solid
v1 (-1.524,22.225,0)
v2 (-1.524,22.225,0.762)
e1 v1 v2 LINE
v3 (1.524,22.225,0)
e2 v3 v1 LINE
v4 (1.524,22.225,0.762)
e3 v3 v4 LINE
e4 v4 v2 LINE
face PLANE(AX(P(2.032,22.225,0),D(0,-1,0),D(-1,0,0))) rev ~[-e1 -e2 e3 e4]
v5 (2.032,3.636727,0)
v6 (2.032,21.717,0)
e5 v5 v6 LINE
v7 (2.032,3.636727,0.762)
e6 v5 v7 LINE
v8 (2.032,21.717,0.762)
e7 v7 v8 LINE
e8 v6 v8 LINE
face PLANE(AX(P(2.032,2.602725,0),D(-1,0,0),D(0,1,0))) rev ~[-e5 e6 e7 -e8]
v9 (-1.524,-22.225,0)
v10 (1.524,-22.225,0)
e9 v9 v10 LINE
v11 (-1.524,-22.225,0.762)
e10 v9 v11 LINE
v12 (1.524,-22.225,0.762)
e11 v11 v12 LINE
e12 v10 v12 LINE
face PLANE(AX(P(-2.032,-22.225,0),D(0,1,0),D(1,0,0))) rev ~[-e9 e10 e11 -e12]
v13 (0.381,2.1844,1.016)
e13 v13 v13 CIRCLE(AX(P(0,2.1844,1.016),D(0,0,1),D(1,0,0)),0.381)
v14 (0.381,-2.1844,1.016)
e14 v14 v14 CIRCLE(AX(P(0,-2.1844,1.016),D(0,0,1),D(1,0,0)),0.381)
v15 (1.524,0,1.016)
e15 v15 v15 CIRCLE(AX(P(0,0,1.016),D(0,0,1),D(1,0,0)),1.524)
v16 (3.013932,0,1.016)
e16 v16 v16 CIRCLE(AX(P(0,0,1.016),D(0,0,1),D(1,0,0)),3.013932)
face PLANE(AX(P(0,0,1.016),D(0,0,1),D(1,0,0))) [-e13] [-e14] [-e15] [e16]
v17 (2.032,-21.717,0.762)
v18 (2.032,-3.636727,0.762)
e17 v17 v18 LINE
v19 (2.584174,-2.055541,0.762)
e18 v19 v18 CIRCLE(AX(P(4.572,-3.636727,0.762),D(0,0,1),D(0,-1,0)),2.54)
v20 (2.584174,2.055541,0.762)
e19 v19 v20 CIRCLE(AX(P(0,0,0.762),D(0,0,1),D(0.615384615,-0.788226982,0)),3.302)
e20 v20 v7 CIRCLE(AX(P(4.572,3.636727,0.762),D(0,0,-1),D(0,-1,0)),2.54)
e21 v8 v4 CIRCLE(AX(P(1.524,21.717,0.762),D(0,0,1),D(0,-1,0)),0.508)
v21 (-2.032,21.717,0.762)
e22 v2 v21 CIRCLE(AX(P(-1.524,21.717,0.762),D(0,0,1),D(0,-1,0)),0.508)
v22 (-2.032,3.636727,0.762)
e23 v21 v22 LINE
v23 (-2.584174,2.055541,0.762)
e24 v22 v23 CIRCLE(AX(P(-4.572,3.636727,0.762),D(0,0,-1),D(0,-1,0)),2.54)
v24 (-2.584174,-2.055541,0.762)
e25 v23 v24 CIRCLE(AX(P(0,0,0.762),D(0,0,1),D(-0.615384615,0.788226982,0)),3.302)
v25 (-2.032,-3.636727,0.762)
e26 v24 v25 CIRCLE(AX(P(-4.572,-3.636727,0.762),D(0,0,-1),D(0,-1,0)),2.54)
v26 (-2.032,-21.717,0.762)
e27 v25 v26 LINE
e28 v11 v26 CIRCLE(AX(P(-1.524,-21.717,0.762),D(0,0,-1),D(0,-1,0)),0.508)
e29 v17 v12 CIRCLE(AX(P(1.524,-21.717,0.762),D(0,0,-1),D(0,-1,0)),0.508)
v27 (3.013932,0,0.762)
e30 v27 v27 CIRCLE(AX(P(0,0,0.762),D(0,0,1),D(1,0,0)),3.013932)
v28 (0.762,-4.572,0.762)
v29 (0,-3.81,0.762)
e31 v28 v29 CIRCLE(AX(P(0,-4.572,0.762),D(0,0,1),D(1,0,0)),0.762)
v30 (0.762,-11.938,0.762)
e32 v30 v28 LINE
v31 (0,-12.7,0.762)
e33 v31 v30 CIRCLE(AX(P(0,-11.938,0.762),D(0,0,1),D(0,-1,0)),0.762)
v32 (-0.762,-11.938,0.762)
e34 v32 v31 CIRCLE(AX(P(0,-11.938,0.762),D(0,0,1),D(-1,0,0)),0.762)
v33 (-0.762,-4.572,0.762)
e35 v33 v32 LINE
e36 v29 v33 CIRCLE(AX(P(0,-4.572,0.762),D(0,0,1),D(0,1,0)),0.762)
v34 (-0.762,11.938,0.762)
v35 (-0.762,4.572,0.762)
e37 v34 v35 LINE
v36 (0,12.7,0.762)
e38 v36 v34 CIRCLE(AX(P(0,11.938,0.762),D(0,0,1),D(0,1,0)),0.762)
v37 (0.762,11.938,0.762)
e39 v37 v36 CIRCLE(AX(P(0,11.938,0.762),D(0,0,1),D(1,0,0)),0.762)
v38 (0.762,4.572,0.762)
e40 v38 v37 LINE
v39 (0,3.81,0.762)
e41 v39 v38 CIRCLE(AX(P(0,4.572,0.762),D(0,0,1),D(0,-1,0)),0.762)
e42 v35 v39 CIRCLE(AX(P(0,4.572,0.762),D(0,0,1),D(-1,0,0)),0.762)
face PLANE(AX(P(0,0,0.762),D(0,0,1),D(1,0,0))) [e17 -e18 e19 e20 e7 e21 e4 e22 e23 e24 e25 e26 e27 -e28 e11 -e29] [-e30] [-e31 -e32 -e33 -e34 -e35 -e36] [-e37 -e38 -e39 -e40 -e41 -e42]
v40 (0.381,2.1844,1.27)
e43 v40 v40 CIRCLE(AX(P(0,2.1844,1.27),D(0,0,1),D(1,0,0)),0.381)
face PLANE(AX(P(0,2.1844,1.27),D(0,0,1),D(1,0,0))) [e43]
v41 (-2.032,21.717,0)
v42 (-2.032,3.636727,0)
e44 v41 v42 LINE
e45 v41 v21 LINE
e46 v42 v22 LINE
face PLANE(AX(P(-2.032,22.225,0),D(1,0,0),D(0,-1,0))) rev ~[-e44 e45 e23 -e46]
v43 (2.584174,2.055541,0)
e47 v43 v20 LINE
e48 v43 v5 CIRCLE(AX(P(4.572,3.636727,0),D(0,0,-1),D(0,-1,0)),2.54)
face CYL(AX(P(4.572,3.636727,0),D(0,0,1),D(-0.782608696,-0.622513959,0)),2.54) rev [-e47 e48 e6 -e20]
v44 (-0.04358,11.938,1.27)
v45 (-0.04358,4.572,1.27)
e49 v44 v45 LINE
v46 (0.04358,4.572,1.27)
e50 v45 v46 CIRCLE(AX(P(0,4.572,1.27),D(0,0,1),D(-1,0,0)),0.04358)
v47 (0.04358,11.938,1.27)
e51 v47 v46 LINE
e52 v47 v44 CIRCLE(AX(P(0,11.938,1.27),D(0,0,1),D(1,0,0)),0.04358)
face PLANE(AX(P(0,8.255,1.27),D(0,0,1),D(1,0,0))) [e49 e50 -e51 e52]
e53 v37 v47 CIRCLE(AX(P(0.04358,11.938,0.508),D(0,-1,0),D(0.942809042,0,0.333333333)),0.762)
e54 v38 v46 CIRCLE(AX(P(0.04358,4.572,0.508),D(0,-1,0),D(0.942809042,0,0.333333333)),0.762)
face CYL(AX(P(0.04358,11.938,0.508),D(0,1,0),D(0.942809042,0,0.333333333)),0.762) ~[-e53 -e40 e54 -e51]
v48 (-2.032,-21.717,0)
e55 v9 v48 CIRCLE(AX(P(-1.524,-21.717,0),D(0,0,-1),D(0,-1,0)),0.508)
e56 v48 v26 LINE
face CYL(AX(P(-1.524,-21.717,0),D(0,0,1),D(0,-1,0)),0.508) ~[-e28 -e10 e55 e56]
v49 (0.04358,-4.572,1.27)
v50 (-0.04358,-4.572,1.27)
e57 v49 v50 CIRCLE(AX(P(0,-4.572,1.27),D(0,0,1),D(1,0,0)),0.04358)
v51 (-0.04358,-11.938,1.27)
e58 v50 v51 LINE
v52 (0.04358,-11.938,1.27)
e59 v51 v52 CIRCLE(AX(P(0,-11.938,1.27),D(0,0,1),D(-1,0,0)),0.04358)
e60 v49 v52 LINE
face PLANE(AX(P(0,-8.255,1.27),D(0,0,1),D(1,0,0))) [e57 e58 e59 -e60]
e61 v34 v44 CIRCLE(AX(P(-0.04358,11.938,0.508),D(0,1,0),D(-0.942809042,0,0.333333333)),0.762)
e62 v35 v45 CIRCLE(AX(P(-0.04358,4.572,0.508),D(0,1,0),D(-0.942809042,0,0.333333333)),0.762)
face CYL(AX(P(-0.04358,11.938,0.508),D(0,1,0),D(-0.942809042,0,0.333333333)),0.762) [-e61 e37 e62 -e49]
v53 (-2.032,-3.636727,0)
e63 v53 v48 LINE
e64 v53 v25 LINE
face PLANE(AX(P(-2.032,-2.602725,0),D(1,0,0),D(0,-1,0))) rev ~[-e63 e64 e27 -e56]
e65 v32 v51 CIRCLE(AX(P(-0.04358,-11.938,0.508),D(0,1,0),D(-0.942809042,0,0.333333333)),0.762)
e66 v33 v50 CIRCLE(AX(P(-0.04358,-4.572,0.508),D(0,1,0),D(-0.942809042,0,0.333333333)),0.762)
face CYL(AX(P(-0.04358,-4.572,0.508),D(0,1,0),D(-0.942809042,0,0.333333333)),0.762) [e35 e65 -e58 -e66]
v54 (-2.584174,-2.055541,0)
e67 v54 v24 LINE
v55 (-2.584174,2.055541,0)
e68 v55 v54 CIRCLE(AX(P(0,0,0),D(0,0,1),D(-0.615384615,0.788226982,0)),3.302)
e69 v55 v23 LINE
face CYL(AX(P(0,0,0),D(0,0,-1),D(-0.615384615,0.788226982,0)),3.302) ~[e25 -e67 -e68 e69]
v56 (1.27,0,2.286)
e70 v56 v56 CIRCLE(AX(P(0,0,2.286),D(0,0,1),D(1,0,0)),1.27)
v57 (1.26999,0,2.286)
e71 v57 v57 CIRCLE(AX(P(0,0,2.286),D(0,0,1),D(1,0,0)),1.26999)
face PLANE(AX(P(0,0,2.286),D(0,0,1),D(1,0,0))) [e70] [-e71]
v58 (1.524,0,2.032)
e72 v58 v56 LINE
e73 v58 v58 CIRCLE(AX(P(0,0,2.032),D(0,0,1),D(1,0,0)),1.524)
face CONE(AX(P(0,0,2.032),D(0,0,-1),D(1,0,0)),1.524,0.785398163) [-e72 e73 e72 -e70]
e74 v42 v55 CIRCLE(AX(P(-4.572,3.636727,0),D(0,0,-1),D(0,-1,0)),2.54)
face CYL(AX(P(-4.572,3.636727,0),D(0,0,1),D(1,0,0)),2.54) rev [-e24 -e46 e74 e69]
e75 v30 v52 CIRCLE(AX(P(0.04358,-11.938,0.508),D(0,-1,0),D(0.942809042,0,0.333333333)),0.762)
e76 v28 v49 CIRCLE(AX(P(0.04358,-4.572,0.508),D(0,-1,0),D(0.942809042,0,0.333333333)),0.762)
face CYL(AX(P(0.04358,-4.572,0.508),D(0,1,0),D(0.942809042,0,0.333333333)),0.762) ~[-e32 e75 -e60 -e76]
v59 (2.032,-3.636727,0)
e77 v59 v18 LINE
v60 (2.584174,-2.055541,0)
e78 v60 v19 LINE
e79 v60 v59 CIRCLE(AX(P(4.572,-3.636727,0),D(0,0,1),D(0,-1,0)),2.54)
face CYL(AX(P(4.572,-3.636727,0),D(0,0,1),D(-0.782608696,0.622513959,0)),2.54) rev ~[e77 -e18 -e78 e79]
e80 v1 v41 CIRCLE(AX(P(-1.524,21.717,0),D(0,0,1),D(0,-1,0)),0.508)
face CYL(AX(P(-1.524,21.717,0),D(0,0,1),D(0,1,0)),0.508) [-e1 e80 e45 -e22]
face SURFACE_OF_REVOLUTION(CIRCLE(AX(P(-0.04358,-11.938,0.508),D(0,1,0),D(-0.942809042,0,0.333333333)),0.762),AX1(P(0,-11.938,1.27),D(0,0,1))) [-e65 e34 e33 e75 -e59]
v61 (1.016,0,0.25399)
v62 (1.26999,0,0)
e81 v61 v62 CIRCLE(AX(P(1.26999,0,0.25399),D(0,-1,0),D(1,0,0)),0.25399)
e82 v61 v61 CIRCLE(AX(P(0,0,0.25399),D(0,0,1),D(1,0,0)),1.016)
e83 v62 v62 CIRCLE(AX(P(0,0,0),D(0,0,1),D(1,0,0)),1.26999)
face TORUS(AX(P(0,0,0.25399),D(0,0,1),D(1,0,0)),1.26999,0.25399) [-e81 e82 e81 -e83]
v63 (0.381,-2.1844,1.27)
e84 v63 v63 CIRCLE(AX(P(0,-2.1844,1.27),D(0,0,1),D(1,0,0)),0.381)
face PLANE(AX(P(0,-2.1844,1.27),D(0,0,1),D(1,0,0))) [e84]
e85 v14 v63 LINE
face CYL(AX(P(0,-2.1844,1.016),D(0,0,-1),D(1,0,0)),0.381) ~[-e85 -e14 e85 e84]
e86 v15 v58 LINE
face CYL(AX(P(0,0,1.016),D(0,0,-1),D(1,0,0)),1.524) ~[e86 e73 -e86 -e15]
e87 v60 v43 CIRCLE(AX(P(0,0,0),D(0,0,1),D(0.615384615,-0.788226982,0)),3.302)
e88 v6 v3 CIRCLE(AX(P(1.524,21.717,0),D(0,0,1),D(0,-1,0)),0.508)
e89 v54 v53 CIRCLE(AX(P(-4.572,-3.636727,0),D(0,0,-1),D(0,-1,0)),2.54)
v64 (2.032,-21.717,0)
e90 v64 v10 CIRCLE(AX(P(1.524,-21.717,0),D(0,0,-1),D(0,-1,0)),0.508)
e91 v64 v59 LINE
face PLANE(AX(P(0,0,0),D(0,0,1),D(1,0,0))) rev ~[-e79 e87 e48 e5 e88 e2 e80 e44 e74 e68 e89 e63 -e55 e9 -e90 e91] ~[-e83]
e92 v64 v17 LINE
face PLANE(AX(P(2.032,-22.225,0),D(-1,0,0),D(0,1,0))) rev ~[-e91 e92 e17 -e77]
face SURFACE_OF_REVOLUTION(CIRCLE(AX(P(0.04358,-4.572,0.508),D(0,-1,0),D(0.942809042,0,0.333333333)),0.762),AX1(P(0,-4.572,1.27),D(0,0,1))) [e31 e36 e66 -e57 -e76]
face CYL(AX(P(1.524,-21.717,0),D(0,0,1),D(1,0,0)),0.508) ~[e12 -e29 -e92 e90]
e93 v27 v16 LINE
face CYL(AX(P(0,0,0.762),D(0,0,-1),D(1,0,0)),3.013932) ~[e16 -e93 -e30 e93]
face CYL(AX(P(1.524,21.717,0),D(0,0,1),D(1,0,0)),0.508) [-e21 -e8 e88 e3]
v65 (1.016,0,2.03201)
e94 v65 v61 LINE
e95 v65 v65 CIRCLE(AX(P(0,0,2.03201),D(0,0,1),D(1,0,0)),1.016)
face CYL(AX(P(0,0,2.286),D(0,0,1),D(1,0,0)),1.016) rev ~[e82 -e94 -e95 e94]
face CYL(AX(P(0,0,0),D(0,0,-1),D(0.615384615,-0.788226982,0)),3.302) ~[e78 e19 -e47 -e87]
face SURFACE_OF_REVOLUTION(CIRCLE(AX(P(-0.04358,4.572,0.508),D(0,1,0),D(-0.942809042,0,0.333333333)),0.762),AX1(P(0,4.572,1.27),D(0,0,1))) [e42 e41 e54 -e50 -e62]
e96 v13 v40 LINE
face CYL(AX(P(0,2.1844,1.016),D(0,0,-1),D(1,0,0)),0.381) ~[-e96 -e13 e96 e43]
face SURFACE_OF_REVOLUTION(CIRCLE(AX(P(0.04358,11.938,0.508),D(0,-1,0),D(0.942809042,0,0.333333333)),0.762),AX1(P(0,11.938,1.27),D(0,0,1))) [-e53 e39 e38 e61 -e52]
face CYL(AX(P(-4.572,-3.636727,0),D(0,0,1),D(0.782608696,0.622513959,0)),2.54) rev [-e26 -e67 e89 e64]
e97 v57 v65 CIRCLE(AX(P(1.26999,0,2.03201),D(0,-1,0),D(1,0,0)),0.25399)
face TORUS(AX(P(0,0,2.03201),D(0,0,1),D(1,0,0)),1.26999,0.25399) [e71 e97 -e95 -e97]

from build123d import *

# Parameters (mm, degrees)
F1_DEPTH      = 0.762
F2_R          = 2.54
F3_R          = 0.508
F4_R          = 3.0139316414
F5_DEPTH      = 0.254
F6_R          = 1.524
F7_DEPTH      = 1.27
F8_SIZE       = 0.254
F9_R          = 0.381
F10_DEPTH     = 0.254
F11_R         = 1.016
F12_DEPTH     = 25.4
F13_R         = 0.25399
F15_DEPTH     = 0.508
F16_T1_DEPTH  = 7.366
F16_T3_DEPTH  = 7.366
F16_T6_ANGLE  = 180
F16_T8_ANGLE  = 180
F16_T10_ANGLE = 180
F16_T12_ANGLE = 180


# Not quite as in the source:
# - a fillet or chamfer that OpenCascade refuses, or shapes differently, is made with other operations: its cross-section is extruded or revolved along the edge and cut away or added
# - a fillet or chamfer is up to 0.001 mm smaller than in the source, because OpenCascade refuses the exact size


with BuildPart() as f1:
    # F0 (on Top) → F1 (new body)
    with BuildSketch(Plane.XY):
        with BuildLine():
            Line((2.032, -14.605), (2.032, -2.6027254946))
            ThreePointArc((2.032, -2.6027254946), (3.302, 0), (2.032, 2.6027254946))
            Line((2.032, 2.6027254946), (2.032, 14.605))
            Line((2.032, 14.605), (2.032, 22.225))
            Line((2.032, 22.225), (-2.032, 22.225))
            Line((-2.032, 22.225), (-2.032, 14.605))
            Line((-2.032, 14.605), (-2.032, 2.6027254946))
            ThreePointArc((-2.032, 2.6027254946), (-3.302, 0), (-2.032, -2.6027254946))
            Line((-2.032, -2.6027254946), (-2.032, -14.605))
            Line((-2.032, -14.605), (-2.032, -22.225))
            Line((-2.032, -22.225), (2.032, -22.225))
            Line((2.032, -22.225), (2.032, -14.605))
        make_face()
    extrude(amount=F1_DEPTH)

    # F2
    f2_edges = [f1.edges().sort_by_distance(p)[0] for p in [
        (-2.032, 2.602725, 0.381),
        (-2.032, -2.602725, 0.381),
        (2.032, 2.602725, 0.381),
        (2.032, -2.602725, 0.381),
    ]]
    fillet(f2_edges, radius=F2_R)

    # F3
    f3_edges = [f1.edges().sort_by_distance(p)[0] for p in [
        (-2.032, -22.225, 0.381),
        (2.032, -22.225, 0.381),
        (-2.032, 22.225, 0.381),
        (2.032, 22.225, 0.381),
    ]]
    fillet(f3_edges, radius=F3_R)

    # F4 (on face) → F5 (join)
    with BuildSketch(Plane.XY.offset(0.762)):
        Circle(F4_R)
    extrude(amount=F5_DEPTH)

    # F6 (on face) → F7 (join)
    with BuildSketch(Plane.XY.offset(1.016)):
        Circle(F6_R)
    extrude(amount=F7_DEPTH)

    # F8
    f8_edges = [f1.edges().sort_by_distance(p)[0] for p in [
        (-1.524, 0, 2.286),
    ]]
    chamfer(f8_edges, length=F8_SIZE)

    # F9 (on face) → F10 (join)
    with BuildSketch(Plane.XY.offset(1.016)):
        with Locations((0, 2.1844)):
            Circle(F9_R)
        with Locations((0, -2.1844)):
            Circle(F9_R)
    extrude(amount=F10_DEPTH)

    # F11 (on face) → F12 (cut)
    with BuildSketch(Plane.XY.offset(2.286)):
        Circle(F11_R)
    extrude(amount=-F12_DEPTH, mode=Mode.SUBTRACT)

    # F13 (radius 0.254 in the source; OpenCascade refuses exactly that, so slightly less here)
    f13_edges = [f1.edges().sort_by_distance(p)[0] for p in [
        (-1.016, 0, 2.286),
        (-1.016, 0, 0),
    ]]
    fillet(f13_edges, radius=F13_R)

    # F14 (on face) → F15 (join)
    with BuildSketch(Plane.XY.offset(0.762)):
        with BuildLine():
            ThreePointArc((0, 12.7), (-0.5388153673, 12.4768153673), (-0.762, 11.938))
            Line((-0.762, 11.938), (-0.762, 4.572))
            ThreePointArc((-0.762, 4.572), (-0.5388153673, 4.0331846327), (0, 3.81))
            ThreePointArc((0, 3.81), (0.5388153673, 4.0331846327), (0.762, 4.572))
            Line((0.762, 4.572), (0.762, 11.938))
            ThreePointArc((0.762, 11.938), (0.5388153673, 12.4768153673), (0, 12.7))
        make_face()
        with BuildLine():
            ThreePointArc((0, -3.81), (-0.5388153673, -4.0331846327), (-0.762, -4.572))
            Line((-0.762, -4.572), (-0.762, -11.938))
            ThreePointArc((-0.762, -11.938), (-0.5388153673, -12.4768153673), (0, -12.7))
            ThreePointArc((0, -12.7), (0.5388153673, -12.4768153673), (0.762, -11.938))
            Line((0.762, -11.938), (0.762, -4.572))
            ThreePointArc((0.762, -4.572), (0.5388153673, -4.0331846327), (0, -3.81))
        make_face()
    extrude(amount=F15_DEPTH)

    # F16: fillet of radius 0.762 on 8 edges, made by hand

    # F16_s2 → F16_t1 (cut)
    with BuildSketch(Plane.XZ.offset(-11.938)):
        with BuildLine():
            ThreePointArc((-0.762, 0.762), (-0.4835204154, 1.1301703947), (-0.0435795103, 1.27))
            Line((-0.0435795103, 1.27), (-0.762, 1.27))
            Line((-0.762, 1.27), (-0.762, 0.762))
        make_face()
        with BuildLine():
            ThreePointArc((0.762, 0.762), (0.4835204154, 1.1301703947), (0.0435795103, 1.27))
            Line((0.0435795103, 1.27), (0.762, 1.27))
            Line((0.762, 1.27), (0.762, 0.762))
        make_face()
    extrude(amount=F16_T1_DEPTH, mode=Mode.SUBTRACT)

    # F16_s4 → F16_t3 (cut)
    with BuildSketch(Plane.XZ.offset(4.572)):
        with BuildLine():
            ThreePointArc((-0.762, 0.762), (-0.4835204154, 1.1301703947), (-0.0435795103, 1.27))
            Line((-0.0435795103, 1.27), (-0.762, 1.27))
            Line((-0.762, 1.27), (-0.762, 0.762))
        make_face()
        with BuildLine():
            ThreePointArc((0.762, 0.762), (0.4835204154, 1.1301703947), (0.0435795103, 1.27))
            Line((0.0435795103, 1.27), (0.762, 1.27))
            Line((0.762, 1.27), (0.762, 0.762))
        make_face()
    extrude(amount=F16_T3_DEPTH, mode=Mode.SUBTRACT)

    # F16_s5 → F16_t6 (revolve, cut)
    with BuildSketch(Plane.XZ.offset(-11.938)):
        with BuildLine():
            ThreePointArc((0.762, 0.762), (0.4835204154, 1.1301703947), (0.0435795103, 1.27))
            Line((0.0435795103, 1.27), (0.762, 1.27))
            Line((0.762, 1.27), (0.762, 0.762))
        make_face()
    revolve(axis=Axis((0, 11.938, 1.27), (0, 0, 1)), revolution_arc=F16_T6_ANGLE, mode=Mode.SUBTRACT)

    # F16_s7 → F16_t8 (revolve, cut)
    with BuildSketch(Plane.XZ.offset(-4.572)):
        with BuildLine():
            ThreePointArc((-0.762, 0.762), (-0.4835204154, 1.1301703947), (-0.0435795103, 1.27))
            Line((-0.0435795103, 1.27), (-0.762, 1.27))
            Line((-0.762, 1.27), (-0.762, 0.762))
        make_face()
    revolve(axis=Axis((0, 4.572, 1.27), (0, 0, 1)), revolution_arc=F16_T8_ANGLE, mode=Mode.SUBTRACT)

    # F16_s9 → F16_t10 (revolve, cut)
    with BuildSketch(Plane.XZ.offset(4.572)):
        with BuildLine():
            ThreePointArc((0.762, 0.762), (0.4835204154, 1.1301703947), (0.0435795103, 1.27))
            Line((0.0435795103, 1.27), (0.762, 1.27))
            Line((0.762, 1.27), (0.762, 0.762))
        make_face()
    revolve(axis=Axis((0, -4.572, 1.27), (0, 0, 1)), revolution_arc=F16_T10_ANGLE, mode=Mode.SUBTRACT)

    # F16_s11 → F16_t12 (revolve, cut)
    with BuildSketch(Plane.XZ.offset(11.938)):
        with BuildLine():
            ThreePointArc((-0.762, 0.762), (-0.4835204154, 1.1301703947), (-0.0435795103, 1.27))
            Line((-0.0435795103, 1.27), (-0.762, 1.27))
            Line((-0.762, 1.27), (-0.762, 0.762))
        make_face()
    revolve(axis=Axis((0, -11.938, 1.27), (0, 0, 1)), revolution_arc=F16_T12_ANGLE, mode=Mode.SUBTRACT)


solid = f1.part
